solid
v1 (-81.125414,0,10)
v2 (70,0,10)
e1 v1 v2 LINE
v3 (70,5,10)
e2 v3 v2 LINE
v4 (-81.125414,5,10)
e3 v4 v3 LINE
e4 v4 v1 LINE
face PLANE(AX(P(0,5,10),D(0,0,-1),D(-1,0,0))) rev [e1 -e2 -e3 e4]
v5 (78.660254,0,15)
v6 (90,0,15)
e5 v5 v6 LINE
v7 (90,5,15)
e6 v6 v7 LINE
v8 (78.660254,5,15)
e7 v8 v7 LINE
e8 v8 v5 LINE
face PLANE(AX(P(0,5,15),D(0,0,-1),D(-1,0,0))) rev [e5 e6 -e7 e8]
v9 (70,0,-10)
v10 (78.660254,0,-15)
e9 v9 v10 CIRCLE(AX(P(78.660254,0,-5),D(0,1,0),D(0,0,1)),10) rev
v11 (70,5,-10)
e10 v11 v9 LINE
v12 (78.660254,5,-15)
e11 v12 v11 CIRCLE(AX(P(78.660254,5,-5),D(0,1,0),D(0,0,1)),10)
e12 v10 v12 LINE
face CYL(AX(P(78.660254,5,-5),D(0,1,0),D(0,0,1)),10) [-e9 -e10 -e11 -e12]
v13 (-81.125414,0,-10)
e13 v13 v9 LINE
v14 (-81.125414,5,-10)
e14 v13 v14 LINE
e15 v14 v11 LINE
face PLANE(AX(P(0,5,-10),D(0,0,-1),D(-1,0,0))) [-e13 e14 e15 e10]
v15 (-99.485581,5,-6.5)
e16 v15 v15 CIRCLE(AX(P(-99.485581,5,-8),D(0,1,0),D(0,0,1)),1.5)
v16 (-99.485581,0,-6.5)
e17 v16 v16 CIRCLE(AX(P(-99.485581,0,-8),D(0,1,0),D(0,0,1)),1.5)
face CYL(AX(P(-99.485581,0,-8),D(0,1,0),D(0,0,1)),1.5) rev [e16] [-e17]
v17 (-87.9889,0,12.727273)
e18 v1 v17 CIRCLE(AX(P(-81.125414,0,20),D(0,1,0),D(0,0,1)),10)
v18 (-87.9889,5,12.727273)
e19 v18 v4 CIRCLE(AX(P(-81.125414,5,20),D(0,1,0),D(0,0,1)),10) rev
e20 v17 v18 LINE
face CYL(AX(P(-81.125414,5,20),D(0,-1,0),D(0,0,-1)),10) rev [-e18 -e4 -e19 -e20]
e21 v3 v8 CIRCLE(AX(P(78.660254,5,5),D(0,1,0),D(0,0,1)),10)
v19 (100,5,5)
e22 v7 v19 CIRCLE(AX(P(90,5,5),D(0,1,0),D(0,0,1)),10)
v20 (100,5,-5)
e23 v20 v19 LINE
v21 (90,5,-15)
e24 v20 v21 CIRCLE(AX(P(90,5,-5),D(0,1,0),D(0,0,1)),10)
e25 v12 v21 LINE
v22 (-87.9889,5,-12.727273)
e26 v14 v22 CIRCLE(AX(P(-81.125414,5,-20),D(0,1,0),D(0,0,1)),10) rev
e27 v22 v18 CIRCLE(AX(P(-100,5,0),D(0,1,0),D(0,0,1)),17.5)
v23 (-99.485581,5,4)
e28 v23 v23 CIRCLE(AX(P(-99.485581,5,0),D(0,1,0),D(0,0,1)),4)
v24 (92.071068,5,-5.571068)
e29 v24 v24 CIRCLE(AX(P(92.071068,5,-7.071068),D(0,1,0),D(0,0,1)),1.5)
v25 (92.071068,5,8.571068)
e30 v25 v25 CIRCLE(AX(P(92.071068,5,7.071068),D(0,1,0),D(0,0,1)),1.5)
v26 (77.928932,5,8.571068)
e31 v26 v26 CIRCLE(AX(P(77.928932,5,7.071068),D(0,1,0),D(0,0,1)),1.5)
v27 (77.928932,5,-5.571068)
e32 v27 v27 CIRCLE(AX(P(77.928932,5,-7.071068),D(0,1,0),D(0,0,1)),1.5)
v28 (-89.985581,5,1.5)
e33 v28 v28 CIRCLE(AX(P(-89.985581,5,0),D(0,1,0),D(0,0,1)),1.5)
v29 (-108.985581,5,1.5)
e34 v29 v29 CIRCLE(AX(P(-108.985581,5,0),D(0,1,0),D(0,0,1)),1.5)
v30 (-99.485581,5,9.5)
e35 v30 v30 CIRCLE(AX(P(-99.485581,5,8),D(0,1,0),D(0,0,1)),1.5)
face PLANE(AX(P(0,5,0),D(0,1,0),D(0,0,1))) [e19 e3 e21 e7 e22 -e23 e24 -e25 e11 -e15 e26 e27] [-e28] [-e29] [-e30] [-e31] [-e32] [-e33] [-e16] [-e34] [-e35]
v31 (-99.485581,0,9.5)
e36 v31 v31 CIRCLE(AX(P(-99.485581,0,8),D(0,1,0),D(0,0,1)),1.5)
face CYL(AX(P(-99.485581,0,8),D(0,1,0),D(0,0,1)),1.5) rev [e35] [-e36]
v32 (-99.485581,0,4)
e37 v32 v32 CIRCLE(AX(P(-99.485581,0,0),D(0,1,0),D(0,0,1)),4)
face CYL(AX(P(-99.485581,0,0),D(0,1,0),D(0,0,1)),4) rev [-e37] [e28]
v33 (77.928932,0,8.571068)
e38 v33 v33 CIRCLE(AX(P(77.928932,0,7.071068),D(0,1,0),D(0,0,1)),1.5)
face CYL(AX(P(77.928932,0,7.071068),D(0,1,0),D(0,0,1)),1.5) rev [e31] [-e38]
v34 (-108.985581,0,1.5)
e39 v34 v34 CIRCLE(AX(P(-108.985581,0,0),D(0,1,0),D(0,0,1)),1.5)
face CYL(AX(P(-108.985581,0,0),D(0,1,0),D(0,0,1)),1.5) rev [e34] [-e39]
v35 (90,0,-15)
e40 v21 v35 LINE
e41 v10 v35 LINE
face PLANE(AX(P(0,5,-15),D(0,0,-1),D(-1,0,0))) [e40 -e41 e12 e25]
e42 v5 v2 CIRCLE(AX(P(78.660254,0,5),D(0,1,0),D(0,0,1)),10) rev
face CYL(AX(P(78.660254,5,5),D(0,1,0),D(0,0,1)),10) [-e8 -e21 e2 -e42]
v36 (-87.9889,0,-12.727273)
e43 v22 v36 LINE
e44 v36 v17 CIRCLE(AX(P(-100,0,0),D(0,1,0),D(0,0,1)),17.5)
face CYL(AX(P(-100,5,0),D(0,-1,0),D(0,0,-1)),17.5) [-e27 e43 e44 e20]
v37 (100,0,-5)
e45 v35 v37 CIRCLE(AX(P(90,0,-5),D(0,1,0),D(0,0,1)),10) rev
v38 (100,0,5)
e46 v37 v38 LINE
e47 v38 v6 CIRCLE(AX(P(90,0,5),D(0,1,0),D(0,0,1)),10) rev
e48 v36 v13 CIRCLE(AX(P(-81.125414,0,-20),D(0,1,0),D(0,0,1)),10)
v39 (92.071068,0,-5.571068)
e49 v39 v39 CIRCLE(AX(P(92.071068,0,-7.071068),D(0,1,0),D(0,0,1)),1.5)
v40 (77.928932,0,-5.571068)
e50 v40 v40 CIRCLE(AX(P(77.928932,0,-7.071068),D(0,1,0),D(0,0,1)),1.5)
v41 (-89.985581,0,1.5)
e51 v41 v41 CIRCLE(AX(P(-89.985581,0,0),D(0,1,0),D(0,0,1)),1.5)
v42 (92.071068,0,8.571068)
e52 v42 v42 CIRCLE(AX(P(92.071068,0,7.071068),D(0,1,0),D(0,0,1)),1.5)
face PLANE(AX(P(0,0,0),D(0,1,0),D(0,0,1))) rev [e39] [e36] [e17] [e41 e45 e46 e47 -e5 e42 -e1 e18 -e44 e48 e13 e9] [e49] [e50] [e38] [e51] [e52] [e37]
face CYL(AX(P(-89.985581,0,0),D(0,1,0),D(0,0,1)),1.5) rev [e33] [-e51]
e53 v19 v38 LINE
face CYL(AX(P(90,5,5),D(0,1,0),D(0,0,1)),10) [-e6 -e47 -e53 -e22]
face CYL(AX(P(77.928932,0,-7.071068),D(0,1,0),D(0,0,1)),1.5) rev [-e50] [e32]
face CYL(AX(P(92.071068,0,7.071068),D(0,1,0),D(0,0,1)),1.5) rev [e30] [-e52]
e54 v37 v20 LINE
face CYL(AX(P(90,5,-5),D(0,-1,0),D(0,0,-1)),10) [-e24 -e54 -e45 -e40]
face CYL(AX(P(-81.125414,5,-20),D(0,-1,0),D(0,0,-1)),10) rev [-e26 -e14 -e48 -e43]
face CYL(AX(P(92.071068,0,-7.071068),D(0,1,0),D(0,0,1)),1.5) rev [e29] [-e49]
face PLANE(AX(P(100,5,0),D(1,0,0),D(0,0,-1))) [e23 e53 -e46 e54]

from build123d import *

# Parameters (mm, degrees)
BOSS_EXTRUDE1_DEPTH = 5
SKETCH2_R           = 4
SKETCH2_R_2         = 1.5
CUT_EXTRUDE1_DEPTH  = 5
SKETCH3_R           = 1.5
CUT_EXTRUDE2_DEPTH  = 5
FILLET3_R           = 10
FILLET4_R           = 10


with BuildPart() as part:
    # Sketch1 → Boss-Extrude1 (new body)
    with BuildSketch(Plane(origin=(0, 0, 0), x_dir=(1, 0, 0), z_dir=(0, 1, 0))):
        Polygon((-85.638593384, 10), (-100, 10), (-100, -10), (-85.638593384, -10), (70, -10), (70, -15), (100, -15), (100, -10), (100, 10), (100, 15), (70, 15), (70, 10), align=None)
        with BuildLine():
            Line((-100, -10), (-100, 10))
            Line((-100, 10), (-85.638593384, 10))
            ThreePointArc((-85.638593384, 10), (-117.5, 0), (-85.638593384, -10))
            Line((-85.638593384, -10), (-100, -10))
        make_face()
    extrude(amount=BOSS_EXTRUDE1_DEPTH)

    # Sketch2 → Cut-Extrude1 (cut)
    with BuildSketch(Plane(origin=(0, 5, 0), x_dir=(1, 0, 0), z_dir=(0, 1, 0))):
        with Locations(Location((-99.485581351, 0, 0), (0, 0, 270))):
            Circle(SKETCH2_R)
        with Locations(Location((-99.485581351, 8, 0), (0, 0, 270))):
            Circle(SKETCH2_R_2)
        with Locations(Location((-99.485581351, -8, 0), (0, 0, 270))):
            Circle(SKETCH2_R_2)
        with Locations(Location((-108.985581351, 0, 0), (0, 0, 270))):
            Circle(SKETCH2_R_2)
        with Locations(Location((-89.985581351, 0, 0), (0, 0, 270))):
            Circle(SKETCH2_R_2)
    extrude(amount=-CUT_EXTRUDE1_DEPTH, mode=Mode.SUBTRACT)

    # Sketch3 → Cut-Extrude2 (cut)
    with BuildSketch(Plane(origin=(0, 5, 0), x_dir=(1, 0, 0), z_dir=(0, 1, 0))):
        with Locations(Location((77.928932188, 7.071067812, 0), (0, 0, 270))):
            Circle(SKETCH3_R)
        with Locations(Location((92.071067812, 7.071067812, 0), (0, 0, 270))):
            Circle(SKETCH3_R)
        with Locations(Location((92.071067812, -7.071067812, 0), (0, 0, 270))):
            Circle(SKETCH3_R)
        with Locations(Location((77.928932188, -7.071067812, 0), (0, 0, 270))):
            Circle(SKETCH3_R)
    extrude(amount=-CUT_EXTRUDE2_DEPTH, mode=Mode.SUBTRACT)

    # Fillet3
    # the kernel refuses this fillet: 10 mm, written as the material it takes off along each edge
    with BuildSketch(Plane(origin=(70, -21.650635095, 15), x_dir=(0, 0, -1), z_dir=(0, 1, 0))) as fillet3_piece_1:
        with BuildLine():
            CenterArc((10, -8.660254038), FILLET3_R, 120, 60)
            Line((0, -8.660254038), (-0.2, -8.660254038))
            Line((-0.2, -8.660254038), (-0.2, 0))
            Line((-0.2, 0), (0, 0.2))
            ThreePointArc((0, 0.2), (2.5, 0.2), (4.9, 0.173205081))
            Line((4.9, 0.173205081), (5, 0))
        make_face()
    extrude(amount=48.301270189, mode=Mode.SUBTRACT)
    with BuildSketch(Plane(origin=(100, -25, 15), x_dir=(0, 0, -1), z_dir=(0, 1, 0)), Plane(origin=(100, -25, -15), x_dir=(-1, 0, 0), z_dir=(0, 1, 0))) as fillet3_piece_2:
        with BuildLine():
            CenterArc((FILLET3_R, FILLET3_R), FILLET3_R, 180, 90)
            Line((0, FILLET3_R), (-FILLET3_R * 0.02, FILLET3_R))
            Line((-FILLET3_R * 0.02, FILLET3_R), (-FILLET3_R * 0.02, -FILLET3_R * 0.02))
            Line((-FILLET3_R * 0.02, -FILLET3_R * 0.02), (FILLET3_R, -FILLET3_R * 0.02))
            Line((FILLET3_R, -FILLET3_R * 0.02), (FILLET3_R, 0))
        make_face()
    extrude(amount=55, mode=Mode.SUBTRACT)
    with BuildSketch(Plane(origin=(70, -21.650635095, -15), x_dir=(0, 0, 1), z_dir=(0, 1, 0))) as fillet3_piece_3:
        with BuildLine():
            CenterArc((10, 8.660254038), FILLET3_R, 180, 60)
            Line((0, 8.660254038), (-0.2, 8.660254038))
            Line((-0.2, 8.660254038), (-0.2, 0))
            Line((-0.2, 0), (0, -0.2))
            ThreePointArc((0, -0.2), (2.5, -0.2), (4.9, -0.173205081))
            Line((4.9, -0.173205081), (5, 0))
        make_face()
    extrude(amount=48.301270189, mode=Mode.SUBTRACT)

    # Fillet4
    fillet4_edges = [part.edges().sort_by_distance(p)[0] for p in [
        (-85.638593384, 2.5, -10),
        (-85.638593384, 2.5, 10),
    ]]
    fillet(fillet4_edges, radius=FILLET4_R)


solid = part.part
